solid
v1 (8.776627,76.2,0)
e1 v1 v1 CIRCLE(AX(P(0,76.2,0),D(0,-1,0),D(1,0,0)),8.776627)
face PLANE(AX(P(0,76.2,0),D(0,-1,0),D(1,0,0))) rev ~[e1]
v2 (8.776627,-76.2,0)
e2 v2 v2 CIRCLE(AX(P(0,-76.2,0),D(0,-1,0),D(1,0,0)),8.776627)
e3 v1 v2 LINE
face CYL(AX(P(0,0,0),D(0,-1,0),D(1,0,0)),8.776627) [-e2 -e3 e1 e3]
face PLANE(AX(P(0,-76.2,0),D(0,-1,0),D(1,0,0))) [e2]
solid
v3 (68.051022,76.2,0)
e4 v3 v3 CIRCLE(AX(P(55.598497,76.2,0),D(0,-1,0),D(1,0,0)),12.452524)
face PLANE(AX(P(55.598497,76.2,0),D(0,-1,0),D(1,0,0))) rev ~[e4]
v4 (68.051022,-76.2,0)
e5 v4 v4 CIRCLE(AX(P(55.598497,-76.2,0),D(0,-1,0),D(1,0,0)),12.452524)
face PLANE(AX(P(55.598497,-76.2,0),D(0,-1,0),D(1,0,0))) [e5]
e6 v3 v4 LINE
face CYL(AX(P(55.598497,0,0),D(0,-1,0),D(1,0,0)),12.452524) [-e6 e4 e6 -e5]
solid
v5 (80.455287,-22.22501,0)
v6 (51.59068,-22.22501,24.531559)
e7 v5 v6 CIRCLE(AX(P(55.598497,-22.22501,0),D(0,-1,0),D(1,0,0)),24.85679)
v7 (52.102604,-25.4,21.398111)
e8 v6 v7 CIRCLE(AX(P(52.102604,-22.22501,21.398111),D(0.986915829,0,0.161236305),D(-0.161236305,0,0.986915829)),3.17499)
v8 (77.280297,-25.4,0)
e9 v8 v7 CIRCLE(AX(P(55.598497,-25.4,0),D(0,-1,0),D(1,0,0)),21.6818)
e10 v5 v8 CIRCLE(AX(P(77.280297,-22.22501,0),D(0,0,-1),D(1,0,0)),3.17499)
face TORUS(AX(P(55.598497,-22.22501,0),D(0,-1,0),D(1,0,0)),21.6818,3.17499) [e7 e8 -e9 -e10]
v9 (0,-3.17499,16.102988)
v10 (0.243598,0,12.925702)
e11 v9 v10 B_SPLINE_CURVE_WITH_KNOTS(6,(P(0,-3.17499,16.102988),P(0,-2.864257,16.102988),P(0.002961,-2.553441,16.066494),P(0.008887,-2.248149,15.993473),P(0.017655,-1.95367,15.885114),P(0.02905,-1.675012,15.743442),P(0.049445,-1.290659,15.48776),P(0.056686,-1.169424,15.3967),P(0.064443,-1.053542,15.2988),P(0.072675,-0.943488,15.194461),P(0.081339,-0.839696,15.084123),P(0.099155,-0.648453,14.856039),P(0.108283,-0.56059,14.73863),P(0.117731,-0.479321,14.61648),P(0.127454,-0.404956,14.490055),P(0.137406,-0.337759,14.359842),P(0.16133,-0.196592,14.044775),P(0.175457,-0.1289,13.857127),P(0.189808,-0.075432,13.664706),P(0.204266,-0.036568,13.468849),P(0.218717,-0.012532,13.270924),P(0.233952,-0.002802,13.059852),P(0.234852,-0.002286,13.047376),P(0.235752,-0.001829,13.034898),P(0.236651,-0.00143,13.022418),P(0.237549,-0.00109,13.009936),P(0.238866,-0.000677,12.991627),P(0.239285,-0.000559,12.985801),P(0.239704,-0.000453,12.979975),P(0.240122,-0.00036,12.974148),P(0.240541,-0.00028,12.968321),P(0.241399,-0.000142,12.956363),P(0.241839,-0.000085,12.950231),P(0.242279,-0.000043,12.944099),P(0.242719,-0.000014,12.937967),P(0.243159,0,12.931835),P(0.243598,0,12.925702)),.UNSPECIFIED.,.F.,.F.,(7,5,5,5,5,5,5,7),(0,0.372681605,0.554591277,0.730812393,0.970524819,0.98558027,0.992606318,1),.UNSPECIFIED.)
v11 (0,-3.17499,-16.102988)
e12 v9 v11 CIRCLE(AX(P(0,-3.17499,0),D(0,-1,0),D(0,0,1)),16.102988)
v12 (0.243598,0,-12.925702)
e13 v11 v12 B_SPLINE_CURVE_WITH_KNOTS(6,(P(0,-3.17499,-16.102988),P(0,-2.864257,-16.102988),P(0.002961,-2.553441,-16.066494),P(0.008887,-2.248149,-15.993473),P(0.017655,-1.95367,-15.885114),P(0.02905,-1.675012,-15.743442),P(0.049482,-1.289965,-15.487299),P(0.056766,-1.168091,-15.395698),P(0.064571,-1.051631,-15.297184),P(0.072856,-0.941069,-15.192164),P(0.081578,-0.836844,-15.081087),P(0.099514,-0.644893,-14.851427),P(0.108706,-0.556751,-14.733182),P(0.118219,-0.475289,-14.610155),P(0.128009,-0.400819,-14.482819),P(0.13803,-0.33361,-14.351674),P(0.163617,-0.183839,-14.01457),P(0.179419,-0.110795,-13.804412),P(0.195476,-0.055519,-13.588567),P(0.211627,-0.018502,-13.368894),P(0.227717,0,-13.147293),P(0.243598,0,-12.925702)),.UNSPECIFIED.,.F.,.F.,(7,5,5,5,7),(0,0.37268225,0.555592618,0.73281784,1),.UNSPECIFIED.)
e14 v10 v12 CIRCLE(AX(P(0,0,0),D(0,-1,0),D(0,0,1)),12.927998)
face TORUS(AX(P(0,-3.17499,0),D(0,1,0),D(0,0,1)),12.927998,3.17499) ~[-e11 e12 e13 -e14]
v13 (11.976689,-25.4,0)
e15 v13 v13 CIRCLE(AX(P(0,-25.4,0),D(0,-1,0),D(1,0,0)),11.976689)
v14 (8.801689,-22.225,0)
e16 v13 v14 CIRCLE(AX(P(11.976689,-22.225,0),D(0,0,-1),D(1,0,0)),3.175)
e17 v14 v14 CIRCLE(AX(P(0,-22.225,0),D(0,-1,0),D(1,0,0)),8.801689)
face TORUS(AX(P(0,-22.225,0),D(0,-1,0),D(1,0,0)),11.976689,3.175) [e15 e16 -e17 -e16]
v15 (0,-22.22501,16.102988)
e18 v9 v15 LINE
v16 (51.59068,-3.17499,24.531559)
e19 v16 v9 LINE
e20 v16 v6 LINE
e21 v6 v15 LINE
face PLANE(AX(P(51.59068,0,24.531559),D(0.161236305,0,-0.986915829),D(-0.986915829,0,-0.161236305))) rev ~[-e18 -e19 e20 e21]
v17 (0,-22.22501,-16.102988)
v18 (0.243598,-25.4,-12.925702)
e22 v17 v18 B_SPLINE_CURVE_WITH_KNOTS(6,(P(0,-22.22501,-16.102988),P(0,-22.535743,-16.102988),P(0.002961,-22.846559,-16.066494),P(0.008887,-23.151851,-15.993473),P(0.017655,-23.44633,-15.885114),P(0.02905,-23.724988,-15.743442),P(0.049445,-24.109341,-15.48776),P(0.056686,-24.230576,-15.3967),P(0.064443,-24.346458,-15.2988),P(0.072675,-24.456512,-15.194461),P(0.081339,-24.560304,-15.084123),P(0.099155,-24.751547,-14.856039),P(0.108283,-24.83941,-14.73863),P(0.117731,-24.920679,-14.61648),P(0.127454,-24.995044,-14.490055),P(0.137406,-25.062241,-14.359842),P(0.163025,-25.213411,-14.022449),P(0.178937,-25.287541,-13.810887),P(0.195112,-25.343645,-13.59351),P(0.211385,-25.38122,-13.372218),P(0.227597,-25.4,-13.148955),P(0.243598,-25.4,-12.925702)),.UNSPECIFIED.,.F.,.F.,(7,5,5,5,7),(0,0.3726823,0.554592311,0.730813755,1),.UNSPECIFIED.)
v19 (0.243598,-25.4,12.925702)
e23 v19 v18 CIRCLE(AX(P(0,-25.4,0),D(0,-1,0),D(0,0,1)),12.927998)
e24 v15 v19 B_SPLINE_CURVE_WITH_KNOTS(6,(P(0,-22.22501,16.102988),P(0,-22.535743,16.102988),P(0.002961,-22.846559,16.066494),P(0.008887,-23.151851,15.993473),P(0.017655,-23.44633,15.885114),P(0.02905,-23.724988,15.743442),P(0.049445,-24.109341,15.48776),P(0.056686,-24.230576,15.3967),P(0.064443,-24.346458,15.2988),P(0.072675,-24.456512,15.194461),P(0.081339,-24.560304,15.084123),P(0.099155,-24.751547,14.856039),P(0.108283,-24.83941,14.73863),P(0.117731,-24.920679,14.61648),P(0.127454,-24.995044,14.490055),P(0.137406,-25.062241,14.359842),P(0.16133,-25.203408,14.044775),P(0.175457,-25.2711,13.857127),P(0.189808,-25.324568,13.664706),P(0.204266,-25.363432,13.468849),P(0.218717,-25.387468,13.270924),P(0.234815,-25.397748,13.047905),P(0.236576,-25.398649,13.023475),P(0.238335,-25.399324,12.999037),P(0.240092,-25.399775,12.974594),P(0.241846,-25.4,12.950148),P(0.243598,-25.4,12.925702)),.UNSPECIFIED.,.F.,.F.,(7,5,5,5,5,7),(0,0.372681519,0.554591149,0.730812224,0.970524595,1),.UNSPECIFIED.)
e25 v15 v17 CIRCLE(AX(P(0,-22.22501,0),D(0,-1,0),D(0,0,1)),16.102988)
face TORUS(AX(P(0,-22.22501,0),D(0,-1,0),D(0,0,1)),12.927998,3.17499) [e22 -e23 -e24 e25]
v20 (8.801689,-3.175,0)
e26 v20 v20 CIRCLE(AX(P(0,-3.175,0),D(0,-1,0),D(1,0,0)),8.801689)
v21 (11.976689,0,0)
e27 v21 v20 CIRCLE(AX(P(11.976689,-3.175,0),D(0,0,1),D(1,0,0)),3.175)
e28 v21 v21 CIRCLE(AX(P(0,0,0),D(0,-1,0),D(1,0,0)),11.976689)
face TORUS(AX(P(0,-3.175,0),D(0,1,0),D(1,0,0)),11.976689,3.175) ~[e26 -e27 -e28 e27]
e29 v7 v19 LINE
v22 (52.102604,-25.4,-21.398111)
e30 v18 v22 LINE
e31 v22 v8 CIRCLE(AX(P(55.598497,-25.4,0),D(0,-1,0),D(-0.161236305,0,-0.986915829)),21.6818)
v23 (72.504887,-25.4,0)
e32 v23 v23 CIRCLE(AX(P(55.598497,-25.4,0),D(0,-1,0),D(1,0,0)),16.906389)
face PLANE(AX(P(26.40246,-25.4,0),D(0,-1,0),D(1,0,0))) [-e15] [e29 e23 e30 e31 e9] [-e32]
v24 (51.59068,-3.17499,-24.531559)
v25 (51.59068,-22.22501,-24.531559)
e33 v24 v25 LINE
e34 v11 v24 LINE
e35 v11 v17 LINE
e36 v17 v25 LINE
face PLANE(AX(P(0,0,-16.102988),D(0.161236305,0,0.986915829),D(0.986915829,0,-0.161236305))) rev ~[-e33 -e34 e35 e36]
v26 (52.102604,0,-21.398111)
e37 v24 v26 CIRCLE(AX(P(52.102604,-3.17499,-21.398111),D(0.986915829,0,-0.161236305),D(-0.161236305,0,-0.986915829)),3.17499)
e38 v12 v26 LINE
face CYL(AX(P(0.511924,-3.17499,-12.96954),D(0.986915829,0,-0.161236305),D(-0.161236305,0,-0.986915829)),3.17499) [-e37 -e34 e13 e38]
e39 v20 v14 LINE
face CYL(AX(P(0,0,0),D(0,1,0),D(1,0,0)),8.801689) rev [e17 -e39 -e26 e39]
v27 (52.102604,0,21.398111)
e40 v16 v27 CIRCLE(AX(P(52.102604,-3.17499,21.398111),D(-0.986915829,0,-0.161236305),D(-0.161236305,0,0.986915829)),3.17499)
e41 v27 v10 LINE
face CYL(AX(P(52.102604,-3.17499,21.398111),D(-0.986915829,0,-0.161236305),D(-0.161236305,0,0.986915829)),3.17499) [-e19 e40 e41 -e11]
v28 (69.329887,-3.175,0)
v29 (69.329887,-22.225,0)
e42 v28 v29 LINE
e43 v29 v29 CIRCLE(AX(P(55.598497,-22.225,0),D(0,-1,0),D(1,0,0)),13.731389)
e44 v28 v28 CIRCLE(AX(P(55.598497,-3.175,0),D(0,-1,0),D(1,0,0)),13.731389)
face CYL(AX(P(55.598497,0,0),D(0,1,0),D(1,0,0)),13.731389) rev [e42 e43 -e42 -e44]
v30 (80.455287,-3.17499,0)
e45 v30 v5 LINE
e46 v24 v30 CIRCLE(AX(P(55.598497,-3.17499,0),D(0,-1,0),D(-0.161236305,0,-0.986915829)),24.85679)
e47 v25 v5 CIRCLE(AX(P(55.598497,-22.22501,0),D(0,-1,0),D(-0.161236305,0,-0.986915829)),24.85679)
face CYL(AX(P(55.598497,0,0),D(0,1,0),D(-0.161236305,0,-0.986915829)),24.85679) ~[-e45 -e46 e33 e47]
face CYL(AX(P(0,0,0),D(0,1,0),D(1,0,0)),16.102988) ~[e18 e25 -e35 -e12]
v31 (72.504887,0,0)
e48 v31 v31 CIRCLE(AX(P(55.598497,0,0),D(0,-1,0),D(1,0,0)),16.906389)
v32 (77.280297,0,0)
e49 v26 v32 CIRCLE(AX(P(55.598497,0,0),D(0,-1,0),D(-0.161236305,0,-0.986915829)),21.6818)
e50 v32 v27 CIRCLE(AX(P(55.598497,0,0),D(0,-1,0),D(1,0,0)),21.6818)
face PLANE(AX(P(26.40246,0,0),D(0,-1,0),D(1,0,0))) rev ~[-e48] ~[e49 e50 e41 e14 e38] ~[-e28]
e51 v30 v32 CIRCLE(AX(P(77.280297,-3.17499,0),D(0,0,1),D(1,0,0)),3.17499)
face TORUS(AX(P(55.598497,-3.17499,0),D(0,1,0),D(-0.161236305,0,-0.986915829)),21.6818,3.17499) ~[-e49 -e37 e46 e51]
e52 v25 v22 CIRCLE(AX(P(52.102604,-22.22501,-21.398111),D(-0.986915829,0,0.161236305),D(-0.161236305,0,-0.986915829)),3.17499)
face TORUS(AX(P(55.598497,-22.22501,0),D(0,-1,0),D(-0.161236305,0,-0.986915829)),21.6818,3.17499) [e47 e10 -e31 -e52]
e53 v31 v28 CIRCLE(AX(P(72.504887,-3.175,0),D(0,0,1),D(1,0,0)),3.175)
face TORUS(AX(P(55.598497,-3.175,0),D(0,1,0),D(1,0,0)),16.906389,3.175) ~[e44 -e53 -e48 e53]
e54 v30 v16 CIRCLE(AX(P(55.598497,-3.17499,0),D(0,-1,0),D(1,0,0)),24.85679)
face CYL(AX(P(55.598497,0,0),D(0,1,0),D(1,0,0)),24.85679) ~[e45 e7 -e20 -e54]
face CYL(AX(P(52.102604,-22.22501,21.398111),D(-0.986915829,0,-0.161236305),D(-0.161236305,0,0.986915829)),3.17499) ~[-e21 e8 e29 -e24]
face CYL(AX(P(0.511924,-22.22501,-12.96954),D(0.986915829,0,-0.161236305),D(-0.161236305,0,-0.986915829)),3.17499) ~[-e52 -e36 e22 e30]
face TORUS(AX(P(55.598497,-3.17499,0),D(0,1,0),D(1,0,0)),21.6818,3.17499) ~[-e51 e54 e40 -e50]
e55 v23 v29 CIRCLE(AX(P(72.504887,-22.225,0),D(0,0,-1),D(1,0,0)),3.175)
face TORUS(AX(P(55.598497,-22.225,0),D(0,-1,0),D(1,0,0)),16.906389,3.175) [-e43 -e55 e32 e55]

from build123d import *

# Parameters (mm, degrees)
F0_R     = 8.8016886399
F0_R_2   = 13.7313892378
F1_DEPTH = 25.4
F2_R     = 3.17499
F3_R     = 3.175
F4_R     = 8.7766269563
F5_DEPTH = 76.2
F6_R     = 12.4525244068
F7_DEPTH = 76.2


# Not quite as in the source:
# - a fillet or chamfer is up to 0.001 mm smaller than in the source, because OpenCascade refuses the exact size


with BuildPart() as f1:
    # F0 (on Front) → F1 (new body)
    with BuildSketch(Plane.XZ):
        with BuildLine():
            ThreePointArc((0, 16.1029876595), (11.3865317714, 11.3865317714), (16.1029876595, 0))
            ThreePointArc((16.1029876595, 0), (11.3865317714, -11.3865317714), (0, -16.1029876595))
            Line((0, -16.1029876595), (51.5906804684, -24.5315592152))
            ThreePointArc((51.5906804684, -24.5315592152), (30.7417076943, 0), (51.5906804684, 24.5315592152))
            Line((51.5906804684, 24.5315592152), (0, 16.1029876595))
        make_face()
        with BuildLine():
            ThreePointArc((0, -16.1029876595), (11.3865317714, -11.3865317714), (16.1029876595, 0))
            ThreePointArc((16.1029876595, 0), (11.3865317714, 11.3865317714), (0, 16.1029876595))
            ThreePointArc((0, 16.1029876595), (-16.1029876595, 0), (0, -16.1029876595))
        make_face()
        Circle(F0_R, mode=Mode.SUBTRACT)
        with BuildLine():
            ThreePointArc((80.4552870872, 0), (71.6956793123, 18.9404521645), (51.5906804684, 24.5315592152))
            ThreePointArc((51.5906804684, 24.5315592152), (30.7417076943, 0), (51.5906804684, -24.5315592152))
            ThreePointArc((51.5906804684, -24.5315592152), (71.6956793123, -18.9404521645), (80.4552870872, 0))
        make_face()
        with Locations((55.5984973907, 0)):
            Circle(F0_R_2, mode=Mode.SUBTRACT)
    extrude(amount=F1_DEPTH)

    # F2 (radius 3.175 in the source; OpenCascade refuses exactly that, so slightly less here)
    f2_edges = [f1.edges().sort_by_distance(p)[0] for p in [
        (80.455287, 0, 0),
        (25.79534, 0, 20.317273),
        (25.79534, -25.4, 20.317273),
        (25.79534, -25.4, -20.317273),
        (25.79534, 0, -20.317273),
        (80.455287, -25.4, 0),
        (-16.102988, -25.4, 0),
        (-16.102988, 0, 0),
    ]]
    fillet(f2_edges, radius=F2_R)

    # F3
    f3_edges = [f1.edges().sort_by_distance(p)[0] for p in [
        (41.867108, -25.4, 0),
        (-8.801689, -25.4, 0),
        (41.867108, 0, 0),
        (-8.801689, 0, 0),
    ]]
    fillet(f3_edges, radius=F3_R)


with BuildPart() as f5:
    # F4 (on Front) → F5 (new body, symmetric)
    with BuildSketch(Plane.XZ):
        Circle(F4_R)
    extrude(amount=F5_DEPTH, both=True)


with BuildPart() as f7:
    # F6 (on Front) → F7 (new body, symmetric)
    with BuildSketch(Plane.XZ):
        with Locations((55.5984973907, 0)):
            Circle(F6_R)
    extrude(amount=F7_DEPTH, both=True)


solid = Compound([f1.part, f5.part, f7.part])
